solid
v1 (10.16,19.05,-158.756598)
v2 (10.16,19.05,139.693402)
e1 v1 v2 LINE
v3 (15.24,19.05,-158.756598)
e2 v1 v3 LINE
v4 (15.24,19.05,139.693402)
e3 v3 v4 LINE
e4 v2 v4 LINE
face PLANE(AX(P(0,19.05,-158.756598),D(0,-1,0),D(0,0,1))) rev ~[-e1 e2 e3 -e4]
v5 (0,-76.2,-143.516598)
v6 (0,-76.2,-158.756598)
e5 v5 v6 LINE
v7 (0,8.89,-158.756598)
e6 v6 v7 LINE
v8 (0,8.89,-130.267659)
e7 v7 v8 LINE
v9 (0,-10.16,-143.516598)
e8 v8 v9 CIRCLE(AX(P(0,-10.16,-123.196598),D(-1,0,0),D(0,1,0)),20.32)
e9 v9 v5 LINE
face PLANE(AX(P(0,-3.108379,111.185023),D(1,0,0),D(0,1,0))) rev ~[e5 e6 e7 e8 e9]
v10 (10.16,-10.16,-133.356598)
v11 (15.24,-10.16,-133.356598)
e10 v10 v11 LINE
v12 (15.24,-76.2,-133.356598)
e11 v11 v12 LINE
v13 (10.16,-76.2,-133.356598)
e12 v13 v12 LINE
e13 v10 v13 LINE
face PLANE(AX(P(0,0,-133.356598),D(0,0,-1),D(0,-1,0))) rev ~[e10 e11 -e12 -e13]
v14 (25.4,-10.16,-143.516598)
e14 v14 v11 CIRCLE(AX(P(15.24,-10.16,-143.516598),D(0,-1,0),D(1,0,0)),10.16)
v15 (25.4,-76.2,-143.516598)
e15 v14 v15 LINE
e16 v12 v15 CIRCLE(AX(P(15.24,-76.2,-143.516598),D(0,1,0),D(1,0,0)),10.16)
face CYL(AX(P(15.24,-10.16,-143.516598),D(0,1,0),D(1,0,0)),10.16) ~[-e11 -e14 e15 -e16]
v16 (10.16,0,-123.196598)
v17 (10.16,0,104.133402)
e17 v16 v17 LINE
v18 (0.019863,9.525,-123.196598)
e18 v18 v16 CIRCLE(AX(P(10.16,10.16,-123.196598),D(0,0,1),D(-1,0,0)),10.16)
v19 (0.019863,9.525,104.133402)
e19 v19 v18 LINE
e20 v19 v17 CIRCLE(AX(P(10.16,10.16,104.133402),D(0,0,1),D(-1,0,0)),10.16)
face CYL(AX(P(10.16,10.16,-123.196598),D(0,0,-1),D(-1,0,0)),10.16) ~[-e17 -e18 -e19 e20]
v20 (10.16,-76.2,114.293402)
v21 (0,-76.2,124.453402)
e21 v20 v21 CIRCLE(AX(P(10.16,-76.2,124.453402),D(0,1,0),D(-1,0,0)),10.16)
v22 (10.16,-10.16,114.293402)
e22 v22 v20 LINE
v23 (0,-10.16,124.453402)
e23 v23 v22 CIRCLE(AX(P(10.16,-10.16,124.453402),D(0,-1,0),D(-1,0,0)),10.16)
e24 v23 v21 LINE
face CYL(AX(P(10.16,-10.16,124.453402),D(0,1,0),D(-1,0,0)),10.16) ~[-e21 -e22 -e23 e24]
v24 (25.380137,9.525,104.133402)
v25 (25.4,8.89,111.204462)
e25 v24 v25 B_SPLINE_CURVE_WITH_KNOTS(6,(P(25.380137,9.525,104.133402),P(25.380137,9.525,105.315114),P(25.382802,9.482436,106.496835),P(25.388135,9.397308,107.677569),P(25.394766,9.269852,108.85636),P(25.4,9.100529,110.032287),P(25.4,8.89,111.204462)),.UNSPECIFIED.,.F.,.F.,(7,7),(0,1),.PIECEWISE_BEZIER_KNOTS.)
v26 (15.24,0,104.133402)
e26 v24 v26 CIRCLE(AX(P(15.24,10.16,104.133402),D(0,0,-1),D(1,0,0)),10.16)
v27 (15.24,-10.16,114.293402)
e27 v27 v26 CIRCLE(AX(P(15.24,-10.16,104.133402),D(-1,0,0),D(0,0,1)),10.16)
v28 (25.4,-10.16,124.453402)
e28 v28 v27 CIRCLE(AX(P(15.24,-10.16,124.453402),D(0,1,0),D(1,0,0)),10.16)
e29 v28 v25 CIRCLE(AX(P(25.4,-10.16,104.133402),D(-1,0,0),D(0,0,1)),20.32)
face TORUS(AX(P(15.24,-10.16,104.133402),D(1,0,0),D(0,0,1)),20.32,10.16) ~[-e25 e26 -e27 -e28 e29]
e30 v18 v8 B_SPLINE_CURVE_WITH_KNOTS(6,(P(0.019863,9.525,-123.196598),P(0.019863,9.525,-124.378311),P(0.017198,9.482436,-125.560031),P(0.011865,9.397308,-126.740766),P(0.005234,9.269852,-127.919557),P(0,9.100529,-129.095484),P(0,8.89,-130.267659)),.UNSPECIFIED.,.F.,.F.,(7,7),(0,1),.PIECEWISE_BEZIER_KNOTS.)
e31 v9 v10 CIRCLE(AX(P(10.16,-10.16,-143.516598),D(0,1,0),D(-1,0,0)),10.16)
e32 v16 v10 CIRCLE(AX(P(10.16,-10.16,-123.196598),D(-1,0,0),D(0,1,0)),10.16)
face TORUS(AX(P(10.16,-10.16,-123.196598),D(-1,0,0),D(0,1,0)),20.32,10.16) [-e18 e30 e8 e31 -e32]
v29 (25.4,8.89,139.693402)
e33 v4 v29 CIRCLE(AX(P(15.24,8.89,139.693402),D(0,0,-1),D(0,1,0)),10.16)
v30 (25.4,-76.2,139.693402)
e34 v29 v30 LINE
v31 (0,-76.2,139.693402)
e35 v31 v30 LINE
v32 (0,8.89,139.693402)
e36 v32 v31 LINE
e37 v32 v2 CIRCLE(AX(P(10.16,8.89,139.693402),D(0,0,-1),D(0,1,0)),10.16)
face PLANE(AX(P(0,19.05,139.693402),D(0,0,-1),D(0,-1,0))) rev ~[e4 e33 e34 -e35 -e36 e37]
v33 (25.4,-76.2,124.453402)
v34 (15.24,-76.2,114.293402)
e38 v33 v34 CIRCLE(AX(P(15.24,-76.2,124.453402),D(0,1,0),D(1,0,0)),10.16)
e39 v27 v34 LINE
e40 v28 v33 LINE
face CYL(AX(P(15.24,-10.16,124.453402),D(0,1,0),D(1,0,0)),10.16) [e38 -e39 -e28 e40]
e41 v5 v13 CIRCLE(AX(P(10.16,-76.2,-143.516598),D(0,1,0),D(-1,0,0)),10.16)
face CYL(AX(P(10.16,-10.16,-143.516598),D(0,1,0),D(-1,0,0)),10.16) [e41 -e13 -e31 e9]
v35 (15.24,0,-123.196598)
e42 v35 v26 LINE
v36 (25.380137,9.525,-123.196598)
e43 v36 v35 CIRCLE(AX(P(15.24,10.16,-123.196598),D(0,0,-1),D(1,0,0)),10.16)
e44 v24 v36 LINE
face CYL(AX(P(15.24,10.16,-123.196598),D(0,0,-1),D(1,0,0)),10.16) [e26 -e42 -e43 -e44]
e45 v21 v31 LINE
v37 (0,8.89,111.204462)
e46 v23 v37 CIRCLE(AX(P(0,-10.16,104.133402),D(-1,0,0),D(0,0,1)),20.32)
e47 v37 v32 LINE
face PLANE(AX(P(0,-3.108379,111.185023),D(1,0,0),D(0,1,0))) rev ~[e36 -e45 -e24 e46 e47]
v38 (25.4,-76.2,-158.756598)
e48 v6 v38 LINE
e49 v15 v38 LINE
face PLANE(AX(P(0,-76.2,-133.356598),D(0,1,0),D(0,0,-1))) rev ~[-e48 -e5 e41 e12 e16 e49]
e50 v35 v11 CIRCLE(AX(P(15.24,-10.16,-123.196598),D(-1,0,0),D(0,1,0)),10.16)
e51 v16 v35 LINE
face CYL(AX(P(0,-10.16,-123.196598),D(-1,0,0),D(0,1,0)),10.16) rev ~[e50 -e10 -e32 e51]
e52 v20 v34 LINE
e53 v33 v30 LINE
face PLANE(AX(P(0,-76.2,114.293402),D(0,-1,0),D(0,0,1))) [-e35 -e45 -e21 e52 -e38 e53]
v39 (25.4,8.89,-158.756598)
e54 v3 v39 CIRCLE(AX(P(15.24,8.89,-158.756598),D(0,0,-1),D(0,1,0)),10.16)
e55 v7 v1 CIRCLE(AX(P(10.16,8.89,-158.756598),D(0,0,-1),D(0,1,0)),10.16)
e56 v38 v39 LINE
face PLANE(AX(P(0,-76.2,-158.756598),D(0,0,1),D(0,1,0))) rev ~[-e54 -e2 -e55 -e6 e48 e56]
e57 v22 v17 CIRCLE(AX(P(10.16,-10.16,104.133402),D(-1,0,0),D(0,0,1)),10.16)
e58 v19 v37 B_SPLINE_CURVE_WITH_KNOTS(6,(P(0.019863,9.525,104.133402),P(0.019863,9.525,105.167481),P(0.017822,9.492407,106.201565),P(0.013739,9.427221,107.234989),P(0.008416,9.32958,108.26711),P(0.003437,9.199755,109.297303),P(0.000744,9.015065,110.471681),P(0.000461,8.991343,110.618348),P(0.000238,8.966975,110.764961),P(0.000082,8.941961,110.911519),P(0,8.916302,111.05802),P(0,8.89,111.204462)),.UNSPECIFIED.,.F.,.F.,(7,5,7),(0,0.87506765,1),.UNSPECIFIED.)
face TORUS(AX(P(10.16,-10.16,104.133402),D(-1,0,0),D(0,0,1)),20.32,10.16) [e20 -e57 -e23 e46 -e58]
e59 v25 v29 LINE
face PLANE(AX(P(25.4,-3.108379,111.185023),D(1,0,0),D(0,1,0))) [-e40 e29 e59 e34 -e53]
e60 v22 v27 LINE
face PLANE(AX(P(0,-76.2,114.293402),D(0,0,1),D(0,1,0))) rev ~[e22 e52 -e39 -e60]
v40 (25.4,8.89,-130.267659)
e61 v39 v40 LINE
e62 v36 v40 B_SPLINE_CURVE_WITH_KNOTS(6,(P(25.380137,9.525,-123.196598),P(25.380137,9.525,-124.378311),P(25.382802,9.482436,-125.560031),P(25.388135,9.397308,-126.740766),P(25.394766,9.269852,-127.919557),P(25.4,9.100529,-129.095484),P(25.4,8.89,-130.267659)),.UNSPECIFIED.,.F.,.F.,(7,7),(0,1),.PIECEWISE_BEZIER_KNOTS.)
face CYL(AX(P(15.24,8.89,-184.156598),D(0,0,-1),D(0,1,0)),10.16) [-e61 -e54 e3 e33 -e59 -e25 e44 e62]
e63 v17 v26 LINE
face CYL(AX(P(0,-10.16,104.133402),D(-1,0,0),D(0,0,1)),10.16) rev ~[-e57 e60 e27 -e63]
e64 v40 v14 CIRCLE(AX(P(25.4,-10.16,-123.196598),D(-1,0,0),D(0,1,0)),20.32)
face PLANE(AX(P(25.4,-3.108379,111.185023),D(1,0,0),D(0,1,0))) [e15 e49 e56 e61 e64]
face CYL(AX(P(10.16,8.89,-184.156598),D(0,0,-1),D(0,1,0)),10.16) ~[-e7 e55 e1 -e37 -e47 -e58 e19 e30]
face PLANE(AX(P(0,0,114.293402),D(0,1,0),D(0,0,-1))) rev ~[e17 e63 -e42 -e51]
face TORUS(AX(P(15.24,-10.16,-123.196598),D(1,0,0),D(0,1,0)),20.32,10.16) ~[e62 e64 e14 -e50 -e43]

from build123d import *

# Parameters (mm, degrees)
F0_W         = 76.2
F0_H         = 25.4
F1_DEPTH     = 25.4
F2_T1_DEPTH  = 25.4
F2_T3_DEPTH  = 349.25
F2_T5_DEPTH  = 91.44
F2_T7_DEPTH  = 227.33
F2_T10_ANGLE = 90
F2_T12_ANGLE = 90
F2_T14_ANGLE = 90
F2_T16_ANGLE = 90


# Not quite as in the source:
# - a fillet or chamfer that OpenCascade refuses, or shapes differently, is made with other operations: its cross-section is extruded or revolved along the edge and cut away or added


with BuildPart() as f1:
    # F0 (on Right) → F1 (new body)
    with BuildSketch(Plane.YZ):
        Polygon((19.05, 139.6934016338), (0, 139.6934016338), (0, 114.2934016338), (0, 0), (0, -133.3565983662), (-76.2, -133.3565983662), (-76.2, -158.7565983662), (19.05, -158.7565983662), align=None)
        with Locations((-38.1, 126.9934016338)):
            Rectangle(F0_W, F0_H)
    extrude(amount=F1_DEPTH)

    # F2: fillet of radius 10.16 on 10 edges, made by hand

    # F2_s2 → F2_t1 (join)
    with BuildSketch(Plane.YZ):
        with BuildLine():
            ThreePointArc((-10.16, 114.2934016338), (-2.9757951031, 111.3176065306), (0, 104.1334016338))
            Line((0, 104.1334016338), (0, 114.2934016338))
            Line((0, 114.2934016338), (-10.16, 114.2934016338))
        make_face()
        with BuildLine():
            ThreePointArc((0, -123.1965983662), (-2.9757951031, -130.3808032631), (-10.16, -133.3565983662))
            Line((-10.16, -133.3565983662), (0, -133.3565983662))
            Line((0, -133.3565983662), (0, -123.1965983662))
        make_face()
    extrude(amount=F2_T1_DEPTH)

    # F2_s4 → F2_t3 (cut)
    with BuildSketch(Plane.XY.offset(-184.1565983662)):
        with BuildLine():
            ThreePointArc((10.16, 19.05), (2.9757951031, 16.0742048969), (0, 8.89))
            Line((0, 8.89), (0, 19.05))
            Line((0, 19.05), (10.16, 19.05))
        make_face()
        with BuildLine():
            ThreePointArc((15.24, 19.05), (22.4242048969, 16.0742048969), (25.4, 8.89))
            Line((25.4, 8.89), (25.4, 19.05))
            Line((25.4, 19.05), (15.24, 19.05))
        make_face()
    extrude(amount=F2_T3_DEPTH, mode=Mode.SUBTRACT)

    # F2_s6 → F2_t5 (cut)
    with BuildSketch(Plane.XZ.offset(10.16)):
        with BuildLine():
            ThreePointArc((25.4, 124.4534016338), (22.4242048969, 117.2691967369), (15.24, 114.2934016338))
            Line((15.24, 114.2934016338), (25.4, 114.2934016338))
            Line((25.4, 114.2934016338), (25.4, 124.4534016338))
        make_face()
        with BuildLine():
            ThreePointArc((25.4, -143.5165983662), (22.4242048969, -136.3323934694), (15.24, -133.3565983662))
            Line((15.24, -133.3565983662), (25.4, -133.3565983662))
            Line((25.4, -133.3565983662), (25.4, -143.5165983662))
        make_face()
        with BuildLine():
            ThreePointArc((0, -143.5165983662), (2.9757951031, -136.3323934694), (10.16, -133.3565983662))
            Line((10.16, -133.3565983662), (0, -133.3565983662))
            Line((0, -133.3565983662), (0, -143.5165983662))
        make_face()
        with BuildLine():
            ThreePointArc((0, 124.4534016338), (2.9757951031, 117.2691967369), (10.16, 114.2934016338))
            Line((10.16, 114.2934016338), (0, 114.2934016338))
            Line((0, 114.2934016338), (0, 124.4534016338))
        make_face()
    extrude(amount=F2_T5_DEPTH, mode=Mode.SUBTRACT)

    # F2_s8 → F2_t7 (cut)
    with BuildSketch(Plane.XY.offset(-123.1965983662)):
        with BuildLine():
            ThreePointArc((25.4, 10.16), (22.4242048969, 2.9757951031), (15.24, 0))
            Line((15.24, 0), (25.4, 0))
            Line((25.4, 0), (25.4, 10.16))
        make_face()
        with BuildLine():
            ThreePointArc((0, 10.16), (2.9757951031, 2.9757951031), (10.16, 0))
            Line((10.16, 0), (0, 0))
            Line((0, 0), (0, 10.16))
        make_face()
    extrude(amount=F2_T7_DEPTH, mode=Mode.SUBTRACT)

    # F2_s9 → F2_t10 (revolve, cut)
    with BuildSketch(Plane.XZ.offset(10.16)):
        with BuildLine():
            ThreePointArc((0, 124.4534016338), (2.9757951031, 117.2691967369), (10.16, 114.2934016338))
            Line((10.16, 114.2934016338), (0, 114.2934016338))
            Line((0, 114.2934016338), (0, 124.4534016338))
        make_face()
    revolve(axis=Axis((0, -10.16, 104.1334016338), (-1, 0, 0)), revolution_arc=F2_T10_ANGLE, mode=Mode.SUBTRACT)

    # F2_s11 → F2_t12 (revolve, cut)
    with BuildSketch(Plane.XY.offset(-123.1965983662)):
        with BuildLine():
            ThreePointArc((0, 10.16), (2.9757951031, 2.9757951031), (10.16, 0))
            Line((10.16, 0), (0, 0))
            Line((0, 0), (0, 10.16))
        make_face()
    revolve(axis=Axis((0, -10.16, -123.1965983662), (-1, 0, 0)), revolution_arc=F2_T12_ANGLE, mode=Mode.SUBTRACT)

    # F2_s13 → F2_t14 (revolve, cut)
    with BuildSketch(Plane.XY.offset(-123.1965983662)):
        with BuildLine():
            ThreePointArc((25.4, 10.16), (22.4242048969, 2.9757951031), (15.24, 0))
            Line((15.24, 0), (25.4, 0))
            Line((25.4, 0), (25.4, 10.16))
        make_face()
    revolve(axis=Axis((25.4, -10.16, -123.1965983662), (-1, 0, 0)), revolution_arc=F2_T14_ANGLE, mode=Mode.SUBTRACT)

    # F2_s15 → F2_t16 (revolve, cut)
    with BuildSketch(Plane.XZ.offset(10.16)):
        with BuildLine():
            ThreePointArc((25.4, 124.4534016338), (22.4242048969, 117.2691967369), (15.24, 114.2934016338))
            Line((15.24, 114.2934016338), (25.4, 114.2934016338))
            Line((25.4, 114.2934016338), (25.4, 124.4534016338))
        make_face()
    revolve(axis=Axis((25.4, -10.16, 104.1334016338), (-1, 0, 0)), revolution_arc=F2_T16_ANGLE, mode=Mode.SUBTRACT)


solid = f1.part
